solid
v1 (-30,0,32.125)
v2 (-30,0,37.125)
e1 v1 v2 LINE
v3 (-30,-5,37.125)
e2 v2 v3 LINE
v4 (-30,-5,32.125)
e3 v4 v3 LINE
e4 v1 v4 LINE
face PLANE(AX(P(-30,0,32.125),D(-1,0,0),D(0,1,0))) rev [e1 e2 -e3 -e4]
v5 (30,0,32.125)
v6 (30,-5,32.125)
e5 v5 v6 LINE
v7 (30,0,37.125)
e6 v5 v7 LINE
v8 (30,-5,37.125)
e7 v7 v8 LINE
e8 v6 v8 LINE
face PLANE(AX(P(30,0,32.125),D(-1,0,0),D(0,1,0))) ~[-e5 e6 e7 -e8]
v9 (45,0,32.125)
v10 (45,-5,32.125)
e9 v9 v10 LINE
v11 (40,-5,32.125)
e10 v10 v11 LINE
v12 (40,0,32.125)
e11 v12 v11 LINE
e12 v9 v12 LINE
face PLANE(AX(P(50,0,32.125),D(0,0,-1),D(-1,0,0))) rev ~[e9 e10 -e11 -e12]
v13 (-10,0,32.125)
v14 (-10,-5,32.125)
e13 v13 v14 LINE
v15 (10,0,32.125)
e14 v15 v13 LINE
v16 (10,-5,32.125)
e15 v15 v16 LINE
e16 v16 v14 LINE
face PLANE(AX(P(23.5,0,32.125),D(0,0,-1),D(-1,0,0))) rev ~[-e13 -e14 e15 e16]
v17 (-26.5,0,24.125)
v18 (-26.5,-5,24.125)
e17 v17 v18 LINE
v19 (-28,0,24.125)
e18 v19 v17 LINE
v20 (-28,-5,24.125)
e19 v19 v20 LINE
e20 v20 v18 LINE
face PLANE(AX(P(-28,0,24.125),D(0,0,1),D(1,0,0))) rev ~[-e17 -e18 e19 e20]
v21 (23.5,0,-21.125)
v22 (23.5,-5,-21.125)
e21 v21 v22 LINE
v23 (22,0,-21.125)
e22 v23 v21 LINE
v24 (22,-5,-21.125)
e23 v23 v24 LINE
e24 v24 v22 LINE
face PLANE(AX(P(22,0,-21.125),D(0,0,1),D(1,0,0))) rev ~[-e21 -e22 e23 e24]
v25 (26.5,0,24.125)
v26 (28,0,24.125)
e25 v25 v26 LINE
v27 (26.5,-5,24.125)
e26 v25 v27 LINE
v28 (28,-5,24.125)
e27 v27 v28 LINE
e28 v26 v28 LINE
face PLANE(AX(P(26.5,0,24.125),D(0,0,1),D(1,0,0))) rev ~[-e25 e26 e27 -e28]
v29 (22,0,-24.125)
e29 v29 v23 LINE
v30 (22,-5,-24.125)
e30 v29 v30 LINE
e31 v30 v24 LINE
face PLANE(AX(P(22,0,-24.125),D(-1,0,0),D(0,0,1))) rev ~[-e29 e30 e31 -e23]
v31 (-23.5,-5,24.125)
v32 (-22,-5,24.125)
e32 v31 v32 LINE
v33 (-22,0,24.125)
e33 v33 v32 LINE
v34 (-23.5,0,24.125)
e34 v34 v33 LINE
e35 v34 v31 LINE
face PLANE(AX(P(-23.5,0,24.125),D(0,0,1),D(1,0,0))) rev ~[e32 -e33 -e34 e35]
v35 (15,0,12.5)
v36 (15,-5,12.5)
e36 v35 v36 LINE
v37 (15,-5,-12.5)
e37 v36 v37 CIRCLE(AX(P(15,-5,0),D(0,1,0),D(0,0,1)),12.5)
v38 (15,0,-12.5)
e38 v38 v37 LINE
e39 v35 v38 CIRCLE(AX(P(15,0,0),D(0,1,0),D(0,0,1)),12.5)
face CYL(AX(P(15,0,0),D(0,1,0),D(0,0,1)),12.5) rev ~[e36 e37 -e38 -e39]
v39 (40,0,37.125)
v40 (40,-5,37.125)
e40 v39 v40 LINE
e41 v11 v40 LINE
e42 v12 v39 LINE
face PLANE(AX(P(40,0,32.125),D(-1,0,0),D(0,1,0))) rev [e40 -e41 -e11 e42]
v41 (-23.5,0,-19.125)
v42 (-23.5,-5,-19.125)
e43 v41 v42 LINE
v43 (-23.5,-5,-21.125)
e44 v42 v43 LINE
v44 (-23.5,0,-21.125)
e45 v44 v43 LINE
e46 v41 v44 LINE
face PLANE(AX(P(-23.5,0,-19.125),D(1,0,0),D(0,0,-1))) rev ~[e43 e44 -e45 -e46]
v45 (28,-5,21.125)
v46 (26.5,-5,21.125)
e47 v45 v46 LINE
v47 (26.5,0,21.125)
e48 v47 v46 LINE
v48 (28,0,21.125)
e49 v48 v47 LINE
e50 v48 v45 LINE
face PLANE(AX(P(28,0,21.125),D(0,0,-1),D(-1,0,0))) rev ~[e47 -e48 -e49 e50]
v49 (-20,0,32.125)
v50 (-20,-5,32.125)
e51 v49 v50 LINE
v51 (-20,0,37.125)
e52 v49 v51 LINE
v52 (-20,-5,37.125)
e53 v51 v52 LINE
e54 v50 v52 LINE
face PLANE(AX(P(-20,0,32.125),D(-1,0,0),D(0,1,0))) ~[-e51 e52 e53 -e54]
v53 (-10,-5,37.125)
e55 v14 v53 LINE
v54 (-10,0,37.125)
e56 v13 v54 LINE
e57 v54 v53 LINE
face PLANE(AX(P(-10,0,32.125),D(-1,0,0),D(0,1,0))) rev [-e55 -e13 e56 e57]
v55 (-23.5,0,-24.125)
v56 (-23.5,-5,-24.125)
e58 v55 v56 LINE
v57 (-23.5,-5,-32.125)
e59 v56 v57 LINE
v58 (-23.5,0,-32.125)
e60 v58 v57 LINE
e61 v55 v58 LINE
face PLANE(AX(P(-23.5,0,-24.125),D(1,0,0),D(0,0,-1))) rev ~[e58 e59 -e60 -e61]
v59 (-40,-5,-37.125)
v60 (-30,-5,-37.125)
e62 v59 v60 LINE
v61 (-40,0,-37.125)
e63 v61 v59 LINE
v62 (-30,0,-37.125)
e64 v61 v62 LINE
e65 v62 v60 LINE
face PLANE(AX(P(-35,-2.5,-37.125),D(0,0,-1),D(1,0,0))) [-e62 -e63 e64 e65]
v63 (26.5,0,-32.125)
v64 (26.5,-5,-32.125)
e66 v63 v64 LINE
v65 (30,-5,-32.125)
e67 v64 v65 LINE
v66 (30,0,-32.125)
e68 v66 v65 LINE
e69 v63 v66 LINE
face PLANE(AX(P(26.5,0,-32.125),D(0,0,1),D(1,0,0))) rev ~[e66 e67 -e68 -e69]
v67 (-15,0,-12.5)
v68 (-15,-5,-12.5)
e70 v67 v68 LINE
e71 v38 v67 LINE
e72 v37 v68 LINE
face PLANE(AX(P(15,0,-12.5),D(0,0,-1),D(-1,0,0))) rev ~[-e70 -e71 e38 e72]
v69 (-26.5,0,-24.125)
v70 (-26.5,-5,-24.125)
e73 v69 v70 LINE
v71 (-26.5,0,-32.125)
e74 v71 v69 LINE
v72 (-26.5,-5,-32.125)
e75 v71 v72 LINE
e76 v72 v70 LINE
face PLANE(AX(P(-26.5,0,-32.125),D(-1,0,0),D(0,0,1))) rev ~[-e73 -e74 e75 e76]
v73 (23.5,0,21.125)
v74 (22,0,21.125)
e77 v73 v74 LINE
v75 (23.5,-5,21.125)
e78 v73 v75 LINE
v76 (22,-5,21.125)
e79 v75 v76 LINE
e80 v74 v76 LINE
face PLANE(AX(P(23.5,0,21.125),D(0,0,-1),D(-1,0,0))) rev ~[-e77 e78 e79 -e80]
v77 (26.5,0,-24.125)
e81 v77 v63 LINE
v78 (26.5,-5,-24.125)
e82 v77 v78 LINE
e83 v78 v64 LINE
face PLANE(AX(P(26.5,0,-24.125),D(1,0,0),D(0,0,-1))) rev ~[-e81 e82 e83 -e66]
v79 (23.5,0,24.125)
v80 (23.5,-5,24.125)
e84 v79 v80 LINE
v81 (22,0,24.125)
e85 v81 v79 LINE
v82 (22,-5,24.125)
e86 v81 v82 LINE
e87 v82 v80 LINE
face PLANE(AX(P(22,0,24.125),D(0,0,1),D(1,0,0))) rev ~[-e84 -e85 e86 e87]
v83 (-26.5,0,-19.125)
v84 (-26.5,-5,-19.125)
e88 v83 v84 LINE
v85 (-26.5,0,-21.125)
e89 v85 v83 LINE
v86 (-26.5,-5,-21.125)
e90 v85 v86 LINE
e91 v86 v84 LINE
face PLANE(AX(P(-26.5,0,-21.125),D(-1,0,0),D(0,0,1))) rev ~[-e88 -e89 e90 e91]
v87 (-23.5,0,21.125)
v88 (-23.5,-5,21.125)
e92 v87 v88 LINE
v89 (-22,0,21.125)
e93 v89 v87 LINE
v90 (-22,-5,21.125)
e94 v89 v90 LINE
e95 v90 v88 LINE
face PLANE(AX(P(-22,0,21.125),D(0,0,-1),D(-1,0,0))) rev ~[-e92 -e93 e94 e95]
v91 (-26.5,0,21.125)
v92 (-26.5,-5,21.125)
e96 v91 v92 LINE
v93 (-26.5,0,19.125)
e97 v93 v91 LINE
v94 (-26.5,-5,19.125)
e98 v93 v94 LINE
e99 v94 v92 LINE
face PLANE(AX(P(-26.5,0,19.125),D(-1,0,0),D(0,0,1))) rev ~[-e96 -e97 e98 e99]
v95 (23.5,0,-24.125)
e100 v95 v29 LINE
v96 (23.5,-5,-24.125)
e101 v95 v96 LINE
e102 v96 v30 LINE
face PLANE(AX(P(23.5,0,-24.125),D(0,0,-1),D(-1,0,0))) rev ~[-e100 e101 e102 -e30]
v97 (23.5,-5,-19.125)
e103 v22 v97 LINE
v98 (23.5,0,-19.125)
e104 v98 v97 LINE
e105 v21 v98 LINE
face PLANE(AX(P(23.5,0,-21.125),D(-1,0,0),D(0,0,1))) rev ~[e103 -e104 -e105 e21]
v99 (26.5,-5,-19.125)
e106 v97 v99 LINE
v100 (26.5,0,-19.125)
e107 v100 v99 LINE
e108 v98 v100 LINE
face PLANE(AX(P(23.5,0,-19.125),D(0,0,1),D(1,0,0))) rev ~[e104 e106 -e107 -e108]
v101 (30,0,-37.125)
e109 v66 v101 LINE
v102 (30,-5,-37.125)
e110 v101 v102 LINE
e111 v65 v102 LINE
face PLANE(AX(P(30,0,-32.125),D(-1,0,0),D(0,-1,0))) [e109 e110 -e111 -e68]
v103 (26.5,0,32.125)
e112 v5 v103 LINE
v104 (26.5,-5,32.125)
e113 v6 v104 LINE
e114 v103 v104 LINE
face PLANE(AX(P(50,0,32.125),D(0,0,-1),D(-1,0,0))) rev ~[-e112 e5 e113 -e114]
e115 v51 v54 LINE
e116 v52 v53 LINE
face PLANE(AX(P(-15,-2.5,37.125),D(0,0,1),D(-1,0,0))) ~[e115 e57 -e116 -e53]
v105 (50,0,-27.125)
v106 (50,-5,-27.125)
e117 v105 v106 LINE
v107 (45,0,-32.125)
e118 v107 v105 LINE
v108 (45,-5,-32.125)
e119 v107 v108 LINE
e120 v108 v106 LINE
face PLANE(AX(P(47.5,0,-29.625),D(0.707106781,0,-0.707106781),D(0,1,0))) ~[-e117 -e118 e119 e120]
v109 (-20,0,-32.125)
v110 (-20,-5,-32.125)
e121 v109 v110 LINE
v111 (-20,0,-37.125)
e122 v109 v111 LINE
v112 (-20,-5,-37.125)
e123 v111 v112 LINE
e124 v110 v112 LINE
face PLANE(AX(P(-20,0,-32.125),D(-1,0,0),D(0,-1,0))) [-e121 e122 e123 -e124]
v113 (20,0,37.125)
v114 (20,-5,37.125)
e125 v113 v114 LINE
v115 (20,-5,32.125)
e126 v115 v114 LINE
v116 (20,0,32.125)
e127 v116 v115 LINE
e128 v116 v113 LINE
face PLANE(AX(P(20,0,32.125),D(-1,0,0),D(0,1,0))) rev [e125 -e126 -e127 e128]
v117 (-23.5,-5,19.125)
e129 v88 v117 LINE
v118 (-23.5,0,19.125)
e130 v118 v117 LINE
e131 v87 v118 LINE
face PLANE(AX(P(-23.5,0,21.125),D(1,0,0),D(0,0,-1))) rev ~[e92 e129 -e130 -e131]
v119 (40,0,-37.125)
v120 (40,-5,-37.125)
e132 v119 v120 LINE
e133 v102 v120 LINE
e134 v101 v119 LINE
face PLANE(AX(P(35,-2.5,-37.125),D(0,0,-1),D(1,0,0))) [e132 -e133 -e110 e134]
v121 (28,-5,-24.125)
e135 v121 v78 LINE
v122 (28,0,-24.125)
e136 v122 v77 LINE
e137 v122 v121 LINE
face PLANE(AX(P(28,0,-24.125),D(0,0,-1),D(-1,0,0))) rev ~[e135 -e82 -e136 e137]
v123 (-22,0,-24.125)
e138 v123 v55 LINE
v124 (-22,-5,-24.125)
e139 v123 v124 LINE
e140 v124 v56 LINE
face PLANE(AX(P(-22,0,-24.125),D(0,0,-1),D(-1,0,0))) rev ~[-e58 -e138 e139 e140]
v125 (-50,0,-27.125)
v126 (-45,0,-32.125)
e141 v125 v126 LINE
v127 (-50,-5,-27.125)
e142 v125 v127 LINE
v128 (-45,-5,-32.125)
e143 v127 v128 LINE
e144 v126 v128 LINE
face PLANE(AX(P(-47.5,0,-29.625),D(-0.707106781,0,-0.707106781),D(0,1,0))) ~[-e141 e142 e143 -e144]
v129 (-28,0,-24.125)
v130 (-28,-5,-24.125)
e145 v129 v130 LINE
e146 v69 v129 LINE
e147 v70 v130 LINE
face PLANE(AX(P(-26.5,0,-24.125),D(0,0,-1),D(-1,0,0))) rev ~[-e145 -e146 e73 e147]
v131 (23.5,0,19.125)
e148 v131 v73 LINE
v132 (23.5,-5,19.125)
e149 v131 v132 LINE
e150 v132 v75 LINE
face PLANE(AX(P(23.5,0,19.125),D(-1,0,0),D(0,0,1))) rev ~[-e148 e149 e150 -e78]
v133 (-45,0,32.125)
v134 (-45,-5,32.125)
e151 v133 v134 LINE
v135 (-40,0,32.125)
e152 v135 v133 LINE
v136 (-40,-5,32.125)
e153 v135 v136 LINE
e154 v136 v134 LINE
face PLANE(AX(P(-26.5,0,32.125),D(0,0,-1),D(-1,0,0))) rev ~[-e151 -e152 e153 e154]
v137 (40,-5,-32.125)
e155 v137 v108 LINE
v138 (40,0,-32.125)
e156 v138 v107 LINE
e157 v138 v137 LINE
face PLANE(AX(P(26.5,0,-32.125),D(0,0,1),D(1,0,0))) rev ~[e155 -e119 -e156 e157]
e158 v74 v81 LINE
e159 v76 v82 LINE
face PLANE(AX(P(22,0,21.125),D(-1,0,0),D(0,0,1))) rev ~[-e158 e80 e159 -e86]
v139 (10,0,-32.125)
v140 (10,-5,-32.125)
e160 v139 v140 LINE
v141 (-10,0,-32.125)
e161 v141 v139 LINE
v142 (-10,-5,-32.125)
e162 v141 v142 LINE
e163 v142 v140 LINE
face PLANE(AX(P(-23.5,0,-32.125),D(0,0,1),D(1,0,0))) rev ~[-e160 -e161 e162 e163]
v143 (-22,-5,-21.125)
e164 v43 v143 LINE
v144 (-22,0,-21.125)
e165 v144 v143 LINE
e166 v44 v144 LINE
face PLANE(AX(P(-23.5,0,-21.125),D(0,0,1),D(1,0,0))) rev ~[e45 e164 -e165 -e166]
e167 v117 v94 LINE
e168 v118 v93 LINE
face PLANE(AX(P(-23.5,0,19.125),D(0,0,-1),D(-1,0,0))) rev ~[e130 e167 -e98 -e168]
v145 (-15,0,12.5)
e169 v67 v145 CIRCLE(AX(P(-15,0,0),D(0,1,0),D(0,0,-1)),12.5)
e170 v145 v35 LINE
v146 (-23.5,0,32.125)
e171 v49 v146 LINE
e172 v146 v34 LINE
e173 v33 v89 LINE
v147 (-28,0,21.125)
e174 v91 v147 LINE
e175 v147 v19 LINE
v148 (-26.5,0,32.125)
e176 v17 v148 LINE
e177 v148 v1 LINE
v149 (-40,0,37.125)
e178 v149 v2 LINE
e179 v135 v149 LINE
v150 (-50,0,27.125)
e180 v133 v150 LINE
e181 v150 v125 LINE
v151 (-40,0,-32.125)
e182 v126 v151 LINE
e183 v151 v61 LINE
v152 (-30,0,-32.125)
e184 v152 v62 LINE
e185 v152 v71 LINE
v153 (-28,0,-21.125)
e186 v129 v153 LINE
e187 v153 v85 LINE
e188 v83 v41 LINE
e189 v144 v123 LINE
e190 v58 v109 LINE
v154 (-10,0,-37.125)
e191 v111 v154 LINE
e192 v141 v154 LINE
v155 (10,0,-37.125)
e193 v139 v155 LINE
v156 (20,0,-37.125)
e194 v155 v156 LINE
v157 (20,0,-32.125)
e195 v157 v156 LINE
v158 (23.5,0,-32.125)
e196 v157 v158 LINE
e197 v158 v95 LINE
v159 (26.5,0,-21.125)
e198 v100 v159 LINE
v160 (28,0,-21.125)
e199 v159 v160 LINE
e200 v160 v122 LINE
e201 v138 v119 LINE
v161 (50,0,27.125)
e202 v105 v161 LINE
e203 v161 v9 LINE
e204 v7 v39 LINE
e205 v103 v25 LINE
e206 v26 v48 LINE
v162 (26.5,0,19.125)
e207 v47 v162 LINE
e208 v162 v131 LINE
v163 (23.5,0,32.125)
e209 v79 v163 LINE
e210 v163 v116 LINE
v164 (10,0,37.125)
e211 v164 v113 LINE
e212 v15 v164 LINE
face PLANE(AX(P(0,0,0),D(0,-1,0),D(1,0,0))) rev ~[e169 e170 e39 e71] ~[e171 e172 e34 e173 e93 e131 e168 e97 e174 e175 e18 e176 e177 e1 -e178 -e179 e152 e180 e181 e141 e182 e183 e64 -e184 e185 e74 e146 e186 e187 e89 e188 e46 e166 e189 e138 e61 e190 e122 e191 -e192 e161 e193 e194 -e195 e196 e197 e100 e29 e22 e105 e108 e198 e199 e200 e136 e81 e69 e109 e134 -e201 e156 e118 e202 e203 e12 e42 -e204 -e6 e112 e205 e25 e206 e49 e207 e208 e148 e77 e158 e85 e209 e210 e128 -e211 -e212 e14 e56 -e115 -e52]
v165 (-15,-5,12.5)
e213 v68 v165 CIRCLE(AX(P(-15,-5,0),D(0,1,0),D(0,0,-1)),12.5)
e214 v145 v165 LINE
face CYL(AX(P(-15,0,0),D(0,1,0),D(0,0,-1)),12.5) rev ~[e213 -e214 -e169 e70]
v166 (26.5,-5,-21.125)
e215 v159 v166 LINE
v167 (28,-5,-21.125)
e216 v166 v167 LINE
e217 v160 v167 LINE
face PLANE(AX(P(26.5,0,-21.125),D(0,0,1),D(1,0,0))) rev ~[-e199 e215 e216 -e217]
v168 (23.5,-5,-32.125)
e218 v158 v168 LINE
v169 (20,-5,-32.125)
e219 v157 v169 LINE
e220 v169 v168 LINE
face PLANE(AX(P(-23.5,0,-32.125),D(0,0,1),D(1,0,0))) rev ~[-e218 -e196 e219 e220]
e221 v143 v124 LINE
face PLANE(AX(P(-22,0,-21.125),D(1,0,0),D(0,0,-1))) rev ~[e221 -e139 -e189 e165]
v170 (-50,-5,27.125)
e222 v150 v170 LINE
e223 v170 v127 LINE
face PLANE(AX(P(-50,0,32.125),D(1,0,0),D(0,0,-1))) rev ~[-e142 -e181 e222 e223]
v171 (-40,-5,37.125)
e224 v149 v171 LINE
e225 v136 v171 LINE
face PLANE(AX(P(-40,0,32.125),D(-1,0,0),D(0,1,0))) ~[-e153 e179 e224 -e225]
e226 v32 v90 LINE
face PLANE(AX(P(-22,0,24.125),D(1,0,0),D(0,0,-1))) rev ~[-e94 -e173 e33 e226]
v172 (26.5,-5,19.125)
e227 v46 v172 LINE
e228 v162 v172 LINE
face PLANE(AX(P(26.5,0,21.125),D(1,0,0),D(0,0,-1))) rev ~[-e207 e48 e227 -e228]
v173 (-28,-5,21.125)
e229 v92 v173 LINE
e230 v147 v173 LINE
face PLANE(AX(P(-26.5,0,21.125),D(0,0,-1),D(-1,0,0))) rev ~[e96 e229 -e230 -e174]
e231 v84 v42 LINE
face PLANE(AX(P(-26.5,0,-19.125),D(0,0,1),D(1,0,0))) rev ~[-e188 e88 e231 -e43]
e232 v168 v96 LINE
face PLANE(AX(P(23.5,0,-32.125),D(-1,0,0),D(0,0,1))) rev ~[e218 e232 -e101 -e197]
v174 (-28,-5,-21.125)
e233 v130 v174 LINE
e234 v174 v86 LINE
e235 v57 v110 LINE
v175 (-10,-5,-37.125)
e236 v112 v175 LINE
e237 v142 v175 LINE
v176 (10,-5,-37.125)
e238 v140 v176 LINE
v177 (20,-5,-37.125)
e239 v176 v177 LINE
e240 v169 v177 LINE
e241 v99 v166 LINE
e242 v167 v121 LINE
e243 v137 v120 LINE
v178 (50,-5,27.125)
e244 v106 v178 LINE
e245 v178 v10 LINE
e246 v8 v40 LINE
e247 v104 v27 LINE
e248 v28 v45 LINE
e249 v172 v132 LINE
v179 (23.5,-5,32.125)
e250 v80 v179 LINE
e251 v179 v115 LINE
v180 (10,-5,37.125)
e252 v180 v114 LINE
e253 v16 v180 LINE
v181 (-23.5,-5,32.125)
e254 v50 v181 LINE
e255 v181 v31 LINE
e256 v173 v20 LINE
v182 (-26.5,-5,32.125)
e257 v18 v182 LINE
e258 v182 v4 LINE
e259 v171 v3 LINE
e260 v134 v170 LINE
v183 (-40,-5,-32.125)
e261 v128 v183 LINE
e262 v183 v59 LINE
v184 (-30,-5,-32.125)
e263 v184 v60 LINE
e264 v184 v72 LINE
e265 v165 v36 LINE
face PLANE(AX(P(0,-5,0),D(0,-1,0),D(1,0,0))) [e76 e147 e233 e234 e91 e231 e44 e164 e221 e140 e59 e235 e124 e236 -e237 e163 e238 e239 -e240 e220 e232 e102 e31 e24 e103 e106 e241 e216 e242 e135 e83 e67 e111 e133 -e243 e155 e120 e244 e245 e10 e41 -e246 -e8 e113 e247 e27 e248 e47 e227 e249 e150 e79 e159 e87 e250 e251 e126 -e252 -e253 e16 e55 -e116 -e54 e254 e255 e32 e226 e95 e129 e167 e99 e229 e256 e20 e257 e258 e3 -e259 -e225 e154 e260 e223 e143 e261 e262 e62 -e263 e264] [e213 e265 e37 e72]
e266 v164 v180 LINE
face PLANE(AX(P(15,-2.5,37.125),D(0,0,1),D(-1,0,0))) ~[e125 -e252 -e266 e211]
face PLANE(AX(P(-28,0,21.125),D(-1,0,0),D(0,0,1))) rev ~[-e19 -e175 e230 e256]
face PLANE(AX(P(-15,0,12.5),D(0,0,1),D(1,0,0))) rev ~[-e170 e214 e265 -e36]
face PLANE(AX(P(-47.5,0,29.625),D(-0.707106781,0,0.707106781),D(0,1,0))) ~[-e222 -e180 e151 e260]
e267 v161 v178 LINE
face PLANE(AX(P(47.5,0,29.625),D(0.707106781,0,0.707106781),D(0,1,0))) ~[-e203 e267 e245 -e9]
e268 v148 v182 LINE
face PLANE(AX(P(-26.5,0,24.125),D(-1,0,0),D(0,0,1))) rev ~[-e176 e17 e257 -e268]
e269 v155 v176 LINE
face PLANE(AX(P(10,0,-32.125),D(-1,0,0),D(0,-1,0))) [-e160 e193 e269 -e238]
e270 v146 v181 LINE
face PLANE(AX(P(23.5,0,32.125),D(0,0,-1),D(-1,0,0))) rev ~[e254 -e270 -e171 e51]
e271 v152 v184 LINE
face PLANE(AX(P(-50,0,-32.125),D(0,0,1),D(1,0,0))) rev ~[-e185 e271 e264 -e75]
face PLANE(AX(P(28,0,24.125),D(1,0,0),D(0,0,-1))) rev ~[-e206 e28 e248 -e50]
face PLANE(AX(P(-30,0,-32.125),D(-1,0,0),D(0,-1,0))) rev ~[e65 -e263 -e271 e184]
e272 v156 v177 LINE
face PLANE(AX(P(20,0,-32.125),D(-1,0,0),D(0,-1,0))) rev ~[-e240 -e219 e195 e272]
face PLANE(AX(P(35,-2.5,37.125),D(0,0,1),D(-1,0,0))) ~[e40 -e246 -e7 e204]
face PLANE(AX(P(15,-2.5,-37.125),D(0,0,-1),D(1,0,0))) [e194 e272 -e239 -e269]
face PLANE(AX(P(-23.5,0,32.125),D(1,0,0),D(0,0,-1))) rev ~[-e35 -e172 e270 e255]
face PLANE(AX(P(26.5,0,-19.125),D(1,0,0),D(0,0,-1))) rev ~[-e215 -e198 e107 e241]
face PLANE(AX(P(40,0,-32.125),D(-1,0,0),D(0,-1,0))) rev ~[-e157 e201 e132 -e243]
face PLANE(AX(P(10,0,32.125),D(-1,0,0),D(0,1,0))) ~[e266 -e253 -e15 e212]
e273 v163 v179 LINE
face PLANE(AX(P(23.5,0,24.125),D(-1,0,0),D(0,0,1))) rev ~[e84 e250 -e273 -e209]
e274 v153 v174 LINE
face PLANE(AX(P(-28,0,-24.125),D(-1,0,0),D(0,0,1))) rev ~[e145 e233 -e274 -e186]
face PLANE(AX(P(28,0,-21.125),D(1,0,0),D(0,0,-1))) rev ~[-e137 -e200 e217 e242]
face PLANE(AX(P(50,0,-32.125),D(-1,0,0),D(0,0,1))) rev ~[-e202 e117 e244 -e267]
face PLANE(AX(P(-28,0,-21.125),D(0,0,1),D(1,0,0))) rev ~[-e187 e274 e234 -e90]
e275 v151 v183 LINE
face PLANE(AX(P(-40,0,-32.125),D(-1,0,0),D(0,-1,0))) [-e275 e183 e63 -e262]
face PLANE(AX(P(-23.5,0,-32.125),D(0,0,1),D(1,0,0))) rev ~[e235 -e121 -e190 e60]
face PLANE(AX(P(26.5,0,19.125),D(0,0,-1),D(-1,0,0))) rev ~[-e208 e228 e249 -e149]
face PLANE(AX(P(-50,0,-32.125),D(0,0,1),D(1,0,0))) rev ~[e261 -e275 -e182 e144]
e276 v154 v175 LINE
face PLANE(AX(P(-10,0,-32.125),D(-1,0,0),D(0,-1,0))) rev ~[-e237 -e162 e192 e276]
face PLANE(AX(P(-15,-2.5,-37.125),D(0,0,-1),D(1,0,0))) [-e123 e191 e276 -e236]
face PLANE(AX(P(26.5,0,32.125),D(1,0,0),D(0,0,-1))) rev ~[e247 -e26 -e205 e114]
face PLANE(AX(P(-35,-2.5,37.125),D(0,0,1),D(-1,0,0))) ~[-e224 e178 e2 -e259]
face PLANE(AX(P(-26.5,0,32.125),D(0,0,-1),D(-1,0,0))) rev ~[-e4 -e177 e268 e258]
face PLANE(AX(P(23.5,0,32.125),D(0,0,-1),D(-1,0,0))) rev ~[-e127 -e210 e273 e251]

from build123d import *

# Parameters (mm, degrees)
F1_DEPTH = 5
F2_SIZE  = 5
F3_W     = 10
F3_H     = 5
F4_DEPTH = 5


# Not quite as in the source:
# - a pattern or mirror of a feature is missing from the dataset's text; its kind, count and spacing are read off the source's solid


with BuildPart() as f1:
    # F0 (on Front) → F1 (new body)
    with BuildSketch(Plane.XZ):
        Polygon((-26.5, 32.125), (-50, 32.125), (-50, -32.125), (-26.5, -32.125), (-26.5, -24.125), (-28, -24.125), (-28, -21.125), (-26.5, -21.125), (-26.5, -19.125), (-25, -19.125), (-23.5, -19.125), (-23.5, -21.125), (-22, -21.125), (-22, -24.125), (-23.5, -24.125), (-23.5, -32.125), (-1.5, -32.125), (-1.5, -24.125), (-3, -24.125), (-3, -21.125), (-1.5, -21.125), (-1.5, -19.125), (0, -19.125), (1.5, -19.125), (1.5, -21.125), (3, -21.125), (3, -24.125), (1.5, -24.125), (1.5, -32.125), (23.5, -32.125), (23.5, -24.125), (22, -24.125), (22, -21.125), (23.5, -21.125), (23.5, -19.125), (25, -19.125), (26.5, -19.125), (26.5, -21.125), (28, -21.125), (28, -24.125), (26.5, -24.125), (26.5, -32.125), (50, -32.125), (50, 32.125), (26.5, 32.125), (26.5, 24.125), (28, 24.125), (28, 21.125), (26.5, 21.125), (26.5, 19.125), (25, 19.125), (23.5, 19.125), (23.5, 21.125), (22, 21.125), (22, 24.125), (23.5, 24.125), (23.5, 32.125), (1.5, 32.125), (1.5, 24.125), (3, 24.125), (3, 21.125), (1.5, 21.125), (1.5, 19.125), (0, 19.125), (-1.5, 19.125), (-1.5, 21.125), (-3, 21.125), (-3, 24.125), (-1.5, 24.125), (-1.5, 32.125), (-23.5, 32.125), (-23.5, 24.125), (-22, 24.125), (-22, 21.125), (-23.5, 21.125), (-23.5, 19.125), (-25, 19.125), (-26.5, 19.125), (-26.5, 21.125), (-28, 21.125), (-28, 24.125), (-26.5, 24.125), align=None)
        with BuildLine():
            Line((15, -12.5), (-15, -12.5))
            ThreePointArc((-15, -12.5), (-27.5, 0), (-15, 12.5))
            Line((-15, 12.5), (15, 12.5))
            ThreePointArc((15, 12.5), (27.5, 0), (15, -12.5))
        make_face(mode=Mode.SUBTRACT)
        Polygon((1.5, 32.125), (-1.5, 32.125), (-1.5, 24.125), (-3, 24.125), (-3, 21.125), (-1.5, 21.125), (-1.5, 19.125), (0, 19.125), (1.5, 19.125), (1.5, 21.125), (3, 21.125), (3, 24.125), (1.5, 24.125), align=None)
        Polygon((-1.5, -24.125), (-1.5, -32.125), (1.5, -32.125), (1.5, -24.125), (3, -24.125), (3, -21.125), (1.5, -21.125), (1.5, -19.125), (0, -19.125), (-1.5, -19.125), (-1.5, -21.125), (-3, -21.125), (-3, -24.125), align=None)
    extrude(amount=F1_DEPTH)

    # F2
    f2_edges = [f1.edges().sort_by_distance(p)[0] for p in [
        (-50, -2.5, 32.125),
        (50, -2.5, 32.125),
        (-50, -2.5, -32.125),
        (50, -2.5, -32.125),
    ]]
    chamfer(f2_edges, length=F2_SIZE)

    # F3 (on face) → F4 (join)
    with BuildSketch(Plane(origin=(0, 0, -32.125), x_dir=(1, 0, 0), z_dir=(0, 0, -1))):
        with Locations((35, 2.5)):
            Rectangle(F3_W, F3_H)
        with Locations((15, 2.5)):
            Rectangle(F3_W, F3_H)
        with Locations((-15, 2.5)):
            Rectangle(F3_W, F3_H)
        with Locations((-35, 2.5)):
            Rectangle(F3_W, F3_H)
    f4 = extrude(amount=F4_DEPTH)

    # F4_copies: F4 across plane
    add(f4.mirror(Plane.XY))


solid = f1.part
